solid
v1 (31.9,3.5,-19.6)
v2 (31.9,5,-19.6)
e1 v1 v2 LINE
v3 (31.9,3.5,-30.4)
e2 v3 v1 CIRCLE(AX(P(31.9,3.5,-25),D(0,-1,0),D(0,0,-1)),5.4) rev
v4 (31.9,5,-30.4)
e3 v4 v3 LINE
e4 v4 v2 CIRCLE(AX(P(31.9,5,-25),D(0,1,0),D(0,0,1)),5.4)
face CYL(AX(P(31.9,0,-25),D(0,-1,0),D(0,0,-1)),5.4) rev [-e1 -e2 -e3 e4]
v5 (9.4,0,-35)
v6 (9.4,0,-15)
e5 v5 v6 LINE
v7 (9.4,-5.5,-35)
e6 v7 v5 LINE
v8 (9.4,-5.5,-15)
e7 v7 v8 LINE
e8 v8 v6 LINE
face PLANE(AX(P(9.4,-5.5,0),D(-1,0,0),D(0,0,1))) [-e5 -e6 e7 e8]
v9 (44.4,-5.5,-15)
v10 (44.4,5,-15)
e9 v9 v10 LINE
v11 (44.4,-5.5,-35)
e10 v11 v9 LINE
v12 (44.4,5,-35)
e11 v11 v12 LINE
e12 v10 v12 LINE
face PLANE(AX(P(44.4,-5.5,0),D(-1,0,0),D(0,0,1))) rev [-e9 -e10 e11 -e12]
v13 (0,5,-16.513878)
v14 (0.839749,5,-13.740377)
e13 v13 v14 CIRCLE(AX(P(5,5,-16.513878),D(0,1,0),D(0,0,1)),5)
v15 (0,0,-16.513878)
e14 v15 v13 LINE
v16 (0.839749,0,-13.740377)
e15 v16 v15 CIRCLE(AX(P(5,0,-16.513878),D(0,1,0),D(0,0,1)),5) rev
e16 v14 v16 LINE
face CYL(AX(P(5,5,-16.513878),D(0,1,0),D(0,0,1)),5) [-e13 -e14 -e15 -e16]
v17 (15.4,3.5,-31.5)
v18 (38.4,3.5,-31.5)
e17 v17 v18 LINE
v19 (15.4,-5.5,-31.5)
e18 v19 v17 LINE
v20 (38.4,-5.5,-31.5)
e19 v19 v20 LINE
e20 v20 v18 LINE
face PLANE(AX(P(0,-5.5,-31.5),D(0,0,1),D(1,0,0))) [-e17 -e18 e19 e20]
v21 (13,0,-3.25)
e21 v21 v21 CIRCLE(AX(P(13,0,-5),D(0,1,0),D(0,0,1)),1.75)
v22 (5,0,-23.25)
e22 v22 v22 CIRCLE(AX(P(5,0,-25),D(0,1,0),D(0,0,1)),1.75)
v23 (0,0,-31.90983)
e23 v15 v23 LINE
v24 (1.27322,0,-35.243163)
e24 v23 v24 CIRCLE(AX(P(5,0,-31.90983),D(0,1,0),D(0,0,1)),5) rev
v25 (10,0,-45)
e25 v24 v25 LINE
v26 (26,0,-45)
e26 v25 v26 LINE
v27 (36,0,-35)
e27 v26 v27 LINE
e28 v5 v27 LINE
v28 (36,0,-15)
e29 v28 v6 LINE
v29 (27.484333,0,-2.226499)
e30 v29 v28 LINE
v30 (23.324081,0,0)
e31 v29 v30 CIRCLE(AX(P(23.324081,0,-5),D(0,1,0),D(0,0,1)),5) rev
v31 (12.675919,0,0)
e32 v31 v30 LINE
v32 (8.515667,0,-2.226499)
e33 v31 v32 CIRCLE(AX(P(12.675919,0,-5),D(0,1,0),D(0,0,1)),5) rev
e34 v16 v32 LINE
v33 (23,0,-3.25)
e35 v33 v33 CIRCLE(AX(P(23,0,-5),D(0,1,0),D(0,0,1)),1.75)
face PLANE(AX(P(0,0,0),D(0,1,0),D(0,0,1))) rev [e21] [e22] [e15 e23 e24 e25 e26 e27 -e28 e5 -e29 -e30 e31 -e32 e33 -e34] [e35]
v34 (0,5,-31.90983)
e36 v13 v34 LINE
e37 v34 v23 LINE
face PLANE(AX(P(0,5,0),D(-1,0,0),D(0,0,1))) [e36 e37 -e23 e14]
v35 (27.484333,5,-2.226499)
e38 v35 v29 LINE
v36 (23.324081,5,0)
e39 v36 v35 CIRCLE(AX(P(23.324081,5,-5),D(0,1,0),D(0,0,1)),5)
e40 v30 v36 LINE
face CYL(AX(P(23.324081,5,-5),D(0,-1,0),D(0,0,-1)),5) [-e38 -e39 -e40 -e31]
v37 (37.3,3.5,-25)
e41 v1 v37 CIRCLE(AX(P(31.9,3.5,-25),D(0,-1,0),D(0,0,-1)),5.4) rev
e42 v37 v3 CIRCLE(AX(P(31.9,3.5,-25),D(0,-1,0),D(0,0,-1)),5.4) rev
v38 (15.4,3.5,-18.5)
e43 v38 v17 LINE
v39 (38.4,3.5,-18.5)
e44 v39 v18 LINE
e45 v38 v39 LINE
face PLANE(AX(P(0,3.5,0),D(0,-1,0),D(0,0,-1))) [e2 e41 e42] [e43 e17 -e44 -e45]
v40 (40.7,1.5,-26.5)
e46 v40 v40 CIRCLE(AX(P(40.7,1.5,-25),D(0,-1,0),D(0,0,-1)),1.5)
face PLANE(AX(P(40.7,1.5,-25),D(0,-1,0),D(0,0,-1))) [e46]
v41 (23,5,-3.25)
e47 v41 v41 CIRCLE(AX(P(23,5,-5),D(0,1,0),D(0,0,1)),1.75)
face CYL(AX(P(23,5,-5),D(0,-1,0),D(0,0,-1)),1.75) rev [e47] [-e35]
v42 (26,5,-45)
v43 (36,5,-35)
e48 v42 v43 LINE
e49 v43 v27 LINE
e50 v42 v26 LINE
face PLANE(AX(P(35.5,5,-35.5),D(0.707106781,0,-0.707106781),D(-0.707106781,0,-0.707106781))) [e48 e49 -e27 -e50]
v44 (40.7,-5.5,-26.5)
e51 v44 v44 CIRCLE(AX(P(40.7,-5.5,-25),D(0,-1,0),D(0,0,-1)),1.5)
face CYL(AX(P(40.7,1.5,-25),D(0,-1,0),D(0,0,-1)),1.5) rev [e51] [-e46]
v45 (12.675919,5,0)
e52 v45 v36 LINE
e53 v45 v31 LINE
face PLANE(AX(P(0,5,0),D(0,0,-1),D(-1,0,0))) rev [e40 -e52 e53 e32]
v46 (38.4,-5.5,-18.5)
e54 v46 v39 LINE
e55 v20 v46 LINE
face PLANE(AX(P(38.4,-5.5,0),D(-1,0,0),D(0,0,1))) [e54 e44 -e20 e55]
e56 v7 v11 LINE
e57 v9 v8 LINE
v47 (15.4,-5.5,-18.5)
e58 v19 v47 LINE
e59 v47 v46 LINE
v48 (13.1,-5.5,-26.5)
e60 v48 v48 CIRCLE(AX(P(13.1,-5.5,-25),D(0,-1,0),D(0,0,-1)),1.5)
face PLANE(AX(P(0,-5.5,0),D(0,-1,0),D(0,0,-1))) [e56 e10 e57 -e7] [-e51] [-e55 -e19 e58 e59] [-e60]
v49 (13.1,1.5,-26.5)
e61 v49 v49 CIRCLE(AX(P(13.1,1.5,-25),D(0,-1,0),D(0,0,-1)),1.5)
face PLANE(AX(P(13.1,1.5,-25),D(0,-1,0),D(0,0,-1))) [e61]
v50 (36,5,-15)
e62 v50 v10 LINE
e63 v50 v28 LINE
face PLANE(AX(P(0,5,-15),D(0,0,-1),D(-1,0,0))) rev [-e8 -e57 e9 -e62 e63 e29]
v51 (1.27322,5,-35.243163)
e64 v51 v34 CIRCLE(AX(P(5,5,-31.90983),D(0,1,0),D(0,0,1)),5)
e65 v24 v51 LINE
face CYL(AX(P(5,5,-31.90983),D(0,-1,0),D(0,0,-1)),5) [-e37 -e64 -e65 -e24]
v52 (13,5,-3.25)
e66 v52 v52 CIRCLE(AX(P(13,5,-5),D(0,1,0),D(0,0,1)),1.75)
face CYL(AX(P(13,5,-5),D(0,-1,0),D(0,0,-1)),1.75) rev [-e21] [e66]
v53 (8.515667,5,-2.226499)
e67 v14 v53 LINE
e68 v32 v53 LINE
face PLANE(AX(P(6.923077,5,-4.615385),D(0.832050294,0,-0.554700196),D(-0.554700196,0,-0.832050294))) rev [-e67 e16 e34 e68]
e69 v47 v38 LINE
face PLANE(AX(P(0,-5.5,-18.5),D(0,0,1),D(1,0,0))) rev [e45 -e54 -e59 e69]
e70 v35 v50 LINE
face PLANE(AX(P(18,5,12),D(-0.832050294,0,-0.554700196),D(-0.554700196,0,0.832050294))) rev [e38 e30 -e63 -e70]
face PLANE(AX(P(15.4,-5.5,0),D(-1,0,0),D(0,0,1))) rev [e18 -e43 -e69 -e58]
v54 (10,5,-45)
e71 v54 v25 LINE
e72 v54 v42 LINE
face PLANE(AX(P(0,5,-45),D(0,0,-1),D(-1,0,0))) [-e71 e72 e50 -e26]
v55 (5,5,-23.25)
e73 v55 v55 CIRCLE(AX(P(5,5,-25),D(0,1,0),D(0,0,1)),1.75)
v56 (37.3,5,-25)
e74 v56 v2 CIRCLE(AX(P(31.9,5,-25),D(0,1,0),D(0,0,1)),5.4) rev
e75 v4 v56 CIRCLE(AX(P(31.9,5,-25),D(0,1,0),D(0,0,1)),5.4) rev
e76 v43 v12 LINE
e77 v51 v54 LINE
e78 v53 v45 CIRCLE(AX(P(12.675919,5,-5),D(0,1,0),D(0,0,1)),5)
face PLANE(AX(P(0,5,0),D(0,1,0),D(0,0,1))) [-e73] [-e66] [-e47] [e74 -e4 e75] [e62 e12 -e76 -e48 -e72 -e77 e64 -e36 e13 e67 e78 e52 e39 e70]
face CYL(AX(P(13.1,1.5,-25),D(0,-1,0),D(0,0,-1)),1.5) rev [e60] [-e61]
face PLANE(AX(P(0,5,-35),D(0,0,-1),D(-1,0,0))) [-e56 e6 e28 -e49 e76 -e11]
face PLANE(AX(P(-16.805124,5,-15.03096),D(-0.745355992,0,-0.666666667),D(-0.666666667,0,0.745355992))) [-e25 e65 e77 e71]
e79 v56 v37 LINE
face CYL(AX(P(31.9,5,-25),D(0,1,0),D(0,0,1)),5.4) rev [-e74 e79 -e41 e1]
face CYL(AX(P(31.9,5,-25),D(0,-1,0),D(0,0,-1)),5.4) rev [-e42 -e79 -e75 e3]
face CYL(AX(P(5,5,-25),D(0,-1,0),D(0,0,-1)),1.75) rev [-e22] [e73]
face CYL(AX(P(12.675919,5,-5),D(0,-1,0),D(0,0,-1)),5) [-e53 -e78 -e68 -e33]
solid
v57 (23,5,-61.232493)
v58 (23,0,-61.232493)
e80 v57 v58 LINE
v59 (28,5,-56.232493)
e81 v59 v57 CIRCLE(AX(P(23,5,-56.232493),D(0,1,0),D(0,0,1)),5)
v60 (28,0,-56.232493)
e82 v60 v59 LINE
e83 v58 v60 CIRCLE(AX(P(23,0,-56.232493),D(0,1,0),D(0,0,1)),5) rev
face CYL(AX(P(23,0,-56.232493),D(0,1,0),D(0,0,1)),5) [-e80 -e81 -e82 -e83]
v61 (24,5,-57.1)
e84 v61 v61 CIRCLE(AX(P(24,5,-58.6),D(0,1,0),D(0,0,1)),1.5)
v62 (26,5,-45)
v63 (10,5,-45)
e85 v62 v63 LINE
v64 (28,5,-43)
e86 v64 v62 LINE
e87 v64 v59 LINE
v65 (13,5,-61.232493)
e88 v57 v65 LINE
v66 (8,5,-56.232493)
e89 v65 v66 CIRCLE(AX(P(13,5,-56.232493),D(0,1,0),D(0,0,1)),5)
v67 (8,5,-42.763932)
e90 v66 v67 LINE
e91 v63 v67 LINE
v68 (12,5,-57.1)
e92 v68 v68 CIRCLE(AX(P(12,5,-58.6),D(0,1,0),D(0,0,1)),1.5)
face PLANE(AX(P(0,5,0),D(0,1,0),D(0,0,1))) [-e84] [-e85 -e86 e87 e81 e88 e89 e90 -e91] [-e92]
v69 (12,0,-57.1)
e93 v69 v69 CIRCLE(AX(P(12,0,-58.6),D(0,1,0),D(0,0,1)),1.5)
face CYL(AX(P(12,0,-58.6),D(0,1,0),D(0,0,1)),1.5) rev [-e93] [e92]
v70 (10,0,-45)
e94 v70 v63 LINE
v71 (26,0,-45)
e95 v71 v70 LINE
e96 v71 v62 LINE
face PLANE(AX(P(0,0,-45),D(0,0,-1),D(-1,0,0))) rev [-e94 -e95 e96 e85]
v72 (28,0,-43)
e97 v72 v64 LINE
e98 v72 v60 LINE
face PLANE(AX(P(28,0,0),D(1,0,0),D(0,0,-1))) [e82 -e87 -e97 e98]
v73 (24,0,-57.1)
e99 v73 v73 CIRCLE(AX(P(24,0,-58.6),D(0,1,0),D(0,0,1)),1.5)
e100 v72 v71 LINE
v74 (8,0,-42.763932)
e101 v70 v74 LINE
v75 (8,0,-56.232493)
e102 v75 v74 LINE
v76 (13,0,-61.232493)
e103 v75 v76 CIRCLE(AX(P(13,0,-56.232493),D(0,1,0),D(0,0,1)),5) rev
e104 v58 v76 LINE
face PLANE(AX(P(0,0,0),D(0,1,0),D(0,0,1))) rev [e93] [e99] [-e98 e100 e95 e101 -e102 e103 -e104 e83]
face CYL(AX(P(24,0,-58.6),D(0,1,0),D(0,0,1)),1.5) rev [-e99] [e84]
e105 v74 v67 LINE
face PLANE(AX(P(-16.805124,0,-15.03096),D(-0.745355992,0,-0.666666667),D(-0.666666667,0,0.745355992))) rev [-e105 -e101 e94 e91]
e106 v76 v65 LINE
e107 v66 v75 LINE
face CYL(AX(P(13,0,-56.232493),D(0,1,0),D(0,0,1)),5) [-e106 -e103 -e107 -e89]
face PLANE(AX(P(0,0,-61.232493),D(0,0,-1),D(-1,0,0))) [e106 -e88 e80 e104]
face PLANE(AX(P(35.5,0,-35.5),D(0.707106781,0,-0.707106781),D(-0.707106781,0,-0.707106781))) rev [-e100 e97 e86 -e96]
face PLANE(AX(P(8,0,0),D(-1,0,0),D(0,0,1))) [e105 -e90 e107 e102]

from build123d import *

# Parameters (mm, degrees)
SKETCH1_R           = 1.75
SKETCH1_W           = 7.2
SKETCH1_H           = 5.4
BOSS_EXTRUDE1_DEPTH = 5
FILLET5_RADIUS      = 10
FILLET5_LENGTH      = 5
FILLET2_R           = 5.4
FILLET6_R           = 5.4
SKETCH3_W           = 35
SKETCH3_H           = 20
SKETCH3_W_2         = 23
SKETCH3_H_2         = 13
BOSS_EXTRUDE4_DEPTH = 5.5
SKETCH5_W           = 23
SKETCH5_H           = 13
CUT_EXTRUDE1_DEPTH  = 3.5
CUT_EXTRUDE2_DEPTH  = 76.201396264
SKETCH9_R           = 1.5
CUT_EXTRUDE4_DEPTH  = 7
ESQUISSE4_R         = 1.5
BOSS_EXTRU_1_DEPTH  = 5
CONG_1_R            = 5
CONG_2_R            = 5


with BuildPart() as part:
    # Sketch1 → Boss-Extrude1 (new body)
    # profile 1 of 4: a face of its own
    with BuildSketch(Plane(origin=(0, 0, 0), x_dir=(1, 0, 0), z_dir=(0, 1, 0))):
        with BuildLine():
            Line((3.25, 25), (0, 25))
            Line((0, 25), (0, 15))
            Line((0, 15), (10, 0))
            Line((10, 0), (26, 0))
            Line((26, 0), (36, 15))
            Line((36, 15), (60, 15))
            Line((60, 15), (60, 25))
            Line((60, 25), (44.5, 25))
            Line((44.5, 25), (44.5, 19.6))
            Line((44.5, 19.6), (37.3, 19.6))
            Line((37.3, 19.6), (26.5, 19.6))
            Line((26.5, 19.6), (26.5, 25))
            Line((26.5, 25), (6.75, 25))
            ThreePointArc((6.75, 25), (5, 23.25), (3.25, 25))
        make_face()
        with Locations(Location((13, 5, 0), (0, 0, 270))):
            Circle(SKETCH1_R, mode=Mode.SUBTRACT)
        with Locations(Location((23, 5, 0), (0, 0, 270))):
            Circle(SKETCH1_R, mode=Mode.SUBTRACT)
    # profile 2 of 4: a face of its own
    with BuildSketch(Plane(origin=(0, 0, 0), x_dir=(1, 0, 0), z_dir=(0, 1, 0))):
        with BuildLine():
            Line((10, 45), (0, 33.819660113))
            Line((0, 33.819660113), (0, 25))
            Line((0, 25), (3.25, 25))
            ThreePointArc((3.25, 25), (5, 26.75), (6.75, 25))
            Line((6.75, 25), (26.5, 25))
            Line((26.5, 25), (26.5, 30.4))
            Line((26.5, 30.4), (37.3, 30.4))
            Line((37.3, 30.4), (44.5, 30.4))
            Line((44.5, 30.4), (44.5, 25))
            Line((44.5, 25), (60, 25))
            Line((60, 25), (60, 35))
            Line((60, 35), (36, 35))
            Line((36, 35), (26, 45))
            Line((26, 45), (10, 45))
        make_face()
    # profile 3 of 4: a face of its own
    with BuildSketch(Plane(origin=(0, 0, 0), x_dir=(1, 0, 0), z_dir=(0, 1, 0))):
        with Locations((40.9, 27.7)):
            Rectangle(SKETCH1_W, SKETCH1_H)
    # profile 4 of 4: a face of its own
    with BuildSketch(Plane(origin=(0, 0, 0), x_dir=(1, 0, 0), z_dir=(0, 1, 0))):
        with Locations((40.9, 22.3)):
            Rectangle(SKETCH1_W, SKETCH1_H)
    extrude(amount=BOSS_EXTRUDE1_DEPTH)

    # Fillet5: full round fillet: the end face becomes a half cylinder, R = half its width
    fillet5_face = Plane((60, 2.5, -25), x_dir=(0, -1, 0), z_dir=(1, 0, 0))  # on the end face: x along it, z out of the body
    fillet5_slab = fillet5_face.offset(-FILLET5_RADIUS / 2) * Box(FILLET5_LENGTH, 2 * FILLET5_RADIUS, FILLET5_RADIUS, mode=Mode.PRIVATE)  # the body's end, R deep
    fillet5_round = Plane((50, 2.5, -25), x_dir=(1, 0, 0), z_dir=(0, -1, 0)) * Cylinder(FILLET5_RADIUS, FILLET5_LENGTH, mode=Mode.PRIVATE)  # its axis R under the face
    add(fillet5_slab - fillet5_round, mode=Mode.SUBTRACT)

    # Fillet2
    fillet2_edges = [part.edges().sort_by_distance(p)[0] for p in [
        (26.5, 2.5, -30.4),
        (26.5, 2.5, -19.6),
    ]]
    fillet(fillet2_edges, radius=FILLET2_R - 0.0001)  # a hair under: the kernel refuses the full size

    # Fillet6
    fillet6_edges = [part.edges().sort_by_distance(p)[0] for p in [
        (37.3, 2.5, -19.6),
        (37.3, 2.5, -30.4),
    ]]
    fillet(fillet6_edges, radius=FILLET6_R - 0.0001)  # a hair under: the kernel refuses the full size

    # Sketch3 → Boss-Extrude4 (add)
    with BuildSketch(Plane.XZ):
        with Locations((26.9, -25)):
            Rectangle(SKETCH3_W, SKETCH3_H)
        with Locations((26.9, -25)):
            Rectangle(SKETCH3_W_2, SKETCH3_H_2, mode=Mode.SUBTRACT)
    extrude(amount=BOSS_EXTRUDE4_DEPTH)

    # Sketch5 → Cut-Extrude1 (cut)
    with BuildSketch(Plane.XZ):
        with Locations((26.9, -25)):
            Rectangle(SKETCH5_W, SKETCH5_H)
    extrude(amount=-CUT_EXTRUDE1_DEPTH, mode=Mode.SUBTRACT)

    # Sketch6 → Cut-Extrude2 (cut, through all)
    with BuildSketch(Plane.XZ):
        with BuildLine():
            Line((44.4, -15), (44.4, -35))
            Line((44.4, -35), (50, -35))
            ThreePointArc((50, -35), (60, -25), (50, -15))
            Line((50, -15), (44.4, -15))
        make_face()
    extrude(amount=-CUT_EXTRUDE2_DEPTH, mode=Mode.SUBTRACT)

    # Sketch9 → Cut-Extrude4 (cut)
    with BuildSketch(Plane.XZ.offset(5.5)):
        with Locations(Location((13.1, -25, 0), (0, 0, 270))):
            Circle(SKETCH9_R)
        with Locations(Location((40.7, -25, 0), (0, 0, 270))):
            Circle(SKETCH9_R)
    extrude(amount=-CUT_EXTRUDE4_DEPTH, mode=Mode.SUBTRACT)

    # Congé2
    cong_2_edges = [part.edges().sort_by_distance(p)[0] for p in [
        (26, 2.5, 0),
        (10, 2.5, 0),
        (0, 2.5, -15),
        (0, 2.5, -33.819660113),
    ]]
    fillet(cong_2_edges, radius=CONG_2_R)


with BuildPart() as body_2:
    # Esquisse4 → Boss.-Extru.1 (new body)
    with BuildSketch(Plane(origin=(0, 5, 0), x_dir=(1, 0, 0), z_dir=(0, 1, 0))):
        Polygon((26, 45), (28, 43), (28, 61.232493039), (8, 61.232493039), (8, 42.763932023), (10, 45), align=None)
        with Locations(Location((12, 58.6, 0), (0, 0, 270))):
            Circle(ESQUISSE4_R, mode=Mode.SUBTRACT)
        with Locations(Location((24, 58.6, 0), (0, 0, 270))):
            Circle(ESQUISSE4_R, mode=Mode.SUBTRACT)
    extrude(amount=-BOSS_EXTRU_1_DEPTH)

    # Congé1
    cong_1_edges = [body_2.edges().sort_by_distance(p)[0] for p in [
        (28, 2.5, -61.232493039),
        (8, 2.5, -61.232493039),
    ]]
    fillet(cong_1_edges, radius=CONG_1_R)


solid = Compound([part.part, body_2.part])
